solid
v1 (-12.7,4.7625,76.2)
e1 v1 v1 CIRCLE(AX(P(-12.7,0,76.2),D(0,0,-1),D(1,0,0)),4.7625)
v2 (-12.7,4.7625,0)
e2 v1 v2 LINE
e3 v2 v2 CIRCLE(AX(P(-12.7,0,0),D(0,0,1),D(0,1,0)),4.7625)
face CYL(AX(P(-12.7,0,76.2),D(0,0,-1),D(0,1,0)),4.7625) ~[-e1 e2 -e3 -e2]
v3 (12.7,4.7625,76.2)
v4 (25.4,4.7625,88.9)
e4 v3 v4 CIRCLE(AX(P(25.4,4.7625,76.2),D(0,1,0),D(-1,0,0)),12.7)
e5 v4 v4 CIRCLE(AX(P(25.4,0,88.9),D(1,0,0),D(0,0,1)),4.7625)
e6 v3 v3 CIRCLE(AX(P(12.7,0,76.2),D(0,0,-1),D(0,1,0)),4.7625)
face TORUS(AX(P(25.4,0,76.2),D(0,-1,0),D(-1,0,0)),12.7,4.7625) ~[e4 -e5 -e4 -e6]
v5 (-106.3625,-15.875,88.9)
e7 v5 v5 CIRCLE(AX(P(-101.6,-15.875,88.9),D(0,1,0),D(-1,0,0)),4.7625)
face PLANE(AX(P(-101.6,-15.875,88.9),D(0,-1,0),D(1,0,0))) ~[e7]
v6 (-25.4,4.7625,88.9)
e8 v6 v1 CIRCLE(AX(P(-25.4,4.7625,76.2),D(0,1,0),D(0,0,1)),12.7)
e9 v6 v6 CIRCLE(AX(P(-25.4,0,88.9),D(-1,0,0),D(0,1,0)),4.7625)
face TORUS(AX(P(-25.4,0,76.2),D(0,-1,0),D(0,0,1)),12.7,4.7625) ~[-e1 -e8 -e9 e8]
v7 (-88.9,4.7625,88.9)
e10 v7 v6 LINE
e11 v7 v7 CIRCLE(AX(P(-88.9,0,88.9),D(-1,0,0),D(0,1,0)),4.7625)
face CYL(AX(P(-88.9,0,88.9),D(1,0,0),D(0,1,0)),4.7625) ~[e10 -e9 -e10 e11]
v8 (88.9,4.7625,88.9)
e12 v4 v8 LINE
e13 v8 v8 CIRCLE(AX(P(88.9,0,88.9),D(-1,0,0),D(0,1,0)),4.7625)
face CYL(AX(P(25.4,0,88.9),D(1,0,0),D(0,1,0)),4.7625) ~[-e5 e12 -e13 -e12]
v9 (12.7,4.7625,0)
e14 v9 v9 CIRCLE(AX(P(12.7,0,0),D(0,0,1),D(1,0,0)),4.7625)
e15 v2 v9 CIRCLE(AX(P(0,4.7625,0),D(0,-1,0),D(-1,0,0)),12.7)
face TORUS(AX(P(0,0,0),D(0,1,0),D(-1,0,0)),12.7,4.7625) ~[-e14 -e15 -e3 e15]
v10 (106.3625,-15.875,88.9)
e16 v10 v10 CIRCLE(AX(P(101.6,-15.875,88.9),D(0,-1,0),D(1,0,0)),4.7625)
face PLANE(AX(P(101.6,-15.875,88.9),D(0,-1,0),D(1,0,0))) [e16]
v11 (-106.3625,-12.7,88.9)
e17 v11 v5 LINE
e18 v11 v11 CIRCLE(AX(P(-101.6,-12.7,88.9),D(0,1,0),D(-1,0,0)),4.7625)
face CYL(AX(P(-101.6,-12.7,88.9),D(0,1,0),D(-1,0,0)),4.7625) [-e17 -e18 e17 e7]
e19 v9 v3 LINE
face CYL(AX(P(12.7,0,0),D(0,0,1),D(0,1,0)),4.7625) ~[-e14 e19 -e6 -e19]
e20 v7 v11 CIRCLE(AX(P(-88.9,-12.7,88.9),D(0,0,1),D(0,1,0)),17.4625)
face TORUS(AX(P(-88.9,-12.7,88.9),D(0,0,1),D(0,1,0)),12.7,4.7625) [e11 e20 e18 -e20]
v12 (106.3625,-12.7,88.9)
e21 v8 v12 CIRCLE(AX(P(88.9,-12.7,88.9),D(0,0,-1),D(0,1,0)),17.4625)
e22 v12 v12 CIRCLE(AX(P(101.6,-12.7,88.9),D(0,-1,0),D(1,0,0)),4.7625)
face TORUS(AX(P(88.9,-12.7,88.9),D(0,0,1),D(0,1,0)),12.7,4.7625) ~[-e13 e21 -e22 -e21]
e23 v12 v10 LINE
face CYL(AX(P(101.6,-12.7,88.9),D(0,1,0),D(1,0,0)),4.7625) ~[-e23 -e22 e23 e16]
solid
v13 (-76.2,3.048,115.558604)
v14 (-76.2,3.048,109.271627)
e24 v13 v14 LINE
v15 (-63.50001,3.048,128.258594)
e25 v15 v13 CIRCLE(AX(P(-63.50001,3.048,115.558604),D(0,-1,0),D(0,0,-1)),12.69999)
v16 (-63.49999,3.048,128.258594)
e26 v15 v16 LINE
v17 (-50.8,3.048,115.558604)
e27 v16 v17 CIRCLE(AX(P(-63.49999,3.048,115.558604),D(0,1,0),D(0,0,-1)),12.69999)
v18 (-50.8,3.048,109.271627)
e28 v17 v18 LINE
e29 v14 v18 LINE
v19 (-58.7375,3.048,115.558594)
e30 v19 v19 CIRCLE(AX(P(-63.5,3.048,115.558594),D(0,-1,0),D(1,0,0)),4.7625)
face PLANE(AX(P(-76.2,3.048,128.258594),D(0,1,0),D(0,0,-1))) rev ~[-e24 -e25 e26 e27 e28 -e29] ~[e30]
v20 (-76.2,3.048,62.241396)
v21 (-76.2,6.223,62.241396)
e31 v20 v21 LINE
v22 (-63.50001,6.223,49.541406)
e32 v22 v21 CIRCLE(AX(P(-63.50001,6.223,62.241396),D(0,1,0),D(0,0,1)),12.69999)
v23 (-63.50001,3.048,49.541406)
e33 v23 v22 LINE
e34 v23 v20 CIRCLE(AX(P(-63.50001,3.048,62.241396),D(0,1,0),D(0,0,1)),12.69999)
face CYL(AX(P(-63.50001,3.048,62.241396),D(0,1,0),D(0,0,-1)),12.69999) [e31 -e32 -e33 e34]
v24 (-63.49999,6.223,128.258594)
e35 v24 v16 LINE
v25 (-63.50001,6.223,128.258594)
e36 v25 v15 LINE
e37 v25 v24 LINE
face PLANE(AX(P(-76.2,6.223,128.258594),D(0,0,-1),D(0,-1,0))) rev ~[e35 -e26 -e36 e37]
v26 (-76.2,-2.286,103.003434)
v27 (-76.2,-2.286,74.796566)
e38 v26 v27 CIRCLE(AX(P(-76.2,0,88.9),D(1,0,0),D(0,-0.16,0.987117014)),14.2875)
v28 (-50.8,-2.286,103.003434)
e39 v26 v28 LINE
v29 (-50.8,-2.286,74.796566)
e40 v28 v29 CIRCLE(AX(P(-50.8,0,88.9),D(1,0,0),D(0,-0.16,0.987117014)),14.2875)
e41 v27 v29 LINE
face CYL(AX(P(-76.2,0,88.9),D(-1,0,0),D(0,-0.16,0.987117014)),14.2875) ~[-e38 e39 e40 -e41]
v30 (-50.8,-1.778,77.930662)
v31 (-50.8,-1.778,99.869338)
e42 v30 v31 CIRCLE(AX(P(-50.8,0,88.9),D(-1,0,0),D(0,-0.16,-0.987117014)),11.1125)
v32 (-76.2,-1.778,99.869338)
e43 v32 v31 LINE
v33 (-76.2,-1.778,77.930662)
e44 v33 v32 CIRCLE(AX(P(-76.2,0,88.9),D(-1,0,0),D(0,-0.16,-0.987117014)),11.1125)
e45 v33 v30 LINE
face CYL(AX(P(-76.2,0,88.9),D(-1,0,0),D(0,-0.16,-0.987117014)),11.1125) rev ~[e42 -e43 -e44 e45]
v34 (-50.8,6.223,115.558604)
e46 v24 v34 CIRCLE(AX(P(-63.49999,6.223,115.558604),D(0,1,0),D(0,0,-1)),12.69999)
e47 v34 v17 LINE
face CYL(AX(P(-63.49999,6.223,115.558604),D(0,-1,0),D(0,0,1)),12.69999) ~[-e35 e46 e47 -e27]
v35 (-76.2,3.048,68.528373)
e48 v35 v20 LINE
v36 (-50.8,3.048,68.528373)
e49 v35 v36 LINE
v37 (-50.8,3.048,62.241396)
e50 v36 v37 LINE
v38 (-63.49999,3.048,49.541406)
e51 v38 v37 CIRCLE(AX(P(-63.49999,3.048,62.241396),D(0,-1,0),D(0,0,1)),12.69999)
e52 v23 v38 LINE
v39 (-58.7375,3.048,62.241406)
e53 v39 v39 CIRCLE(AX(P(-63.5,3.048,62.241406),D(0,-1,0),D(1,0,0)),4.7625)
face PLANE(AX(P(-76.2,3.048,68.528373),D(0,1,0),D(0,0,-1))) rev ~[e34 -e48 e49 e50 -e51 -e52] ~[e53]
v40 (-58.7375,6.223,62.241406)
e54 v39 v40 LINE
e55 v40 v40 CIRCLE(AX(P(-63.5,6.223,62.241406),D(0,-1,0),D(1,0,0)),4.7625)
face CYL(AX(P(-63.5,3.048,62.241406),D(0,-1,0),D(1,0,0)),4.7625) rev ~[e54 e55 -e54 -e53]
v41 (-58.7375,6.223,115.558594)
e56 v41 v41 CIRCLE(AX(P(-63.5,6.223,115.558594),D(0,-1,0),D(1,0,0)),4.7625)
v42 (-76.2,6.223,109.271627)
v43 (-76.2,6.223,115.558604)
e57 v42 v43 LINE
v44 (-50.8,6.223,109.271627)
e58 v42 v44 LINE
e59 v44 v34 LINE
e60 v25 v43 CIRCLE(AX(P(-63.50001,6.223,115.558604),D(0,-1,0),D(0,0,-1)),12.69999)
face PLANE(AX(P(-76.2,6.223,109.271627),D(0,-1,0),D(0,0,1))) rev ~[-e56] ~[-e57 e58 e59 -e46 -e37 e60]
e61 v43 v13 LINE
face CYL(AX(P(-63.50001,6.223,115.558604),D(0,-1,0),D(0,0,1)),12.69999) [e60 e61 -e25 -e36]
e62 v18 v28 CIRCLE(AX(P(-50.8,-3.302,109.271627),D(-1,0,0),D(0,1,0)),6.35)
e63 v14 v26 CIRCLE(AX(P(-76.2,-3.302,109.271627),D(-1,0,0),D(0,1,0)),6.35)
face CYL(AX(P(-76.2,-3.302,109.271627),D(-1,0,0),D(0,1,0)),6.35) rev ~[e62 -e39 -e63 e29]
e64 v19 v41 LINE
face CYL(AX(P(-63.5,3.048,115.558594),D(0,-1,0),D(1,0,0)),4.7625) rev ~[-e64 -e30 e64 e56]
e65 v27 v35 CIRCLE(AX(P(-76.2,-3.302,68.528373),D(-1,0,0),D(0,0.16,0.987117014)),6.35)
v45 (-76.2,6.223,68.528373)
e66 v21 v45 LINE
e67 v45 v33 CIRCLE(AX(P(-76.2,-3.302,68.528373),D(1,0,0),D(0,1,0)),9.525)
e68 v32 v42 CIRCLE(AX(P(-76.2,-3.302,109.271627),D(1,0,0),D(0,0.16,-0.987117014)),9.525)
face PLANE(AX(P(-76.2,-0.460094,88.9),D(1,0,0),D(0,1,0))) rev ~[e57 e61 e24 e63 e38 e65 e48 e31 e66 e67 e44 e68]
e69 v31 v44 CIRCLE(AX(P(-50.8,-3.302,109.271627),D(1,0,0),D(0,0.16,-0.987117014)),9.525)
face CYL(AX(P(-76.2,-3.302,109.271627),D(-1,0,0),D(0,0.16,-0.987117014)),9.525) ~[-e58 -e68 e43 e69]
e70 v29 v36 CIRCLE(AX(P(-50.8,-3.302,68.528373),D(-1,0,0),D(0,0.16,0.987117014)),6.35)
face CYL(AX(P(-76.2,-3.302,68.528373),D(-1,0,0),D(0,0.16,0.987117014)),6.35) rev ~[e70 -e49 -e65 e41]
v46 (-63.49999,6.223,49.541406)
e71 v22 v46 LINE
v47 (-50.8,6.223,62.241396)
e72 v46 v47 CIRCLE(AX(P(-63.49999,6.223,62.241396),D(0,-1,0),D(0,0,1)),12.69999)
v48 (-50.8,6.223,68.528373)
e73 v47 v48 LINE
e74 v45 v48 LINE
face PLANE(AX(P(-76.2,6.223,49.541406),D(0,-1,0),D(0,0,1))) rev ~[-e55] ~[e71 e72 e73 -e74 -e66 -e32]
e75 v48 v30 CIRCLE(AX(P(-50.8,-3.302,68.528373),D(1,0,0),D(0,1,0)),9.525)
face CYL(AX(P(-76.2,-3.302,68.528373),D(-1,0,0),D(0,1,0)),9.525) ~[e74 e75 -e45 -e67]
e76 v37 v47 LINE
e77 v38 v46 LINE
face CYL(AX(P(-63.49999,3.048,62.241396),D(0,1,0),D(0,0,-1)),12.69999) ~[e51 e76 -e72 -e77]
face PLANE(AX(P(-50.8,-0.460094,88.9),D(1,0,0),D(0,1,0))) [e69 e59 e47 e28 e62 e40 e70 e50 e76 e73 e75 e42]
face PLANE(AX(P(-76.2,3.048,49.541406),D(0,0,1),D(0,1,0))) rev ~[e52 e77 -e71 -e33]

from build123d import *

# Parameters (mm, degrees)
F2_R      = 4.7625
F5_ANGLE  = 90
F6_DEPTH  = 3.175
F11_DEPTH = 25.4
F12_R     = 12.69999
F13_R     = 4.7625
F14_DEPTH = 3.176


# Not quite as in the source:
# - a fillet or chamfer is up to 0.001 mm smaller than in the source, because OpenCascade refuses the exact size
# - a feature names something its author has since deleted; it is built from what else it names


with BuildPart() as f3:
    # F3: sweep along a path in F0
    with BuildLine(Plane.XZ) as f3_path:
        Line((88.9, 88.9), (25.4, 88.9))
        ThreePointArc((25.4, 88.9), (16.4197438789, 85.1802561211), (12.7, 76.2))
        Line((12.7, 76.2), (12.7, 0))
        ThreePointArc((12.7, 0), (0, -12.7), (-12.7, 0))
        Line((-12.7, 0), (-12.7, 76.2))
        ThreePointArc((-12.7, 76.2), (-16.4197438789, 85.1802561211), (-25.4, 88.9))
        Line((-25.4, 88.9), (-88.9, 88.9))
    # F2 (on line) → F3 (sweep)
    with BuildSketch(Plane.YZ.offset(88.9)):
        with Locations((0, 88.9)):
            Circle(F2_R)
    sweep(path=f3_path.line)

    # F2 (on line) → F5 (revolve)
    with BuildSketch(Plane.YZ.offset(88.9)):
        with Locations((0, 88.9)):
            Circle(F2_R)
    revolve(axis=Axis((88.9, -12.7, 113.1016425788), (0, 0, -1)), revolution_arc=F5_ANGLE)

    # F6 (add): a face of the model
    f6_faces = [f3.faces().sort_by_distance(p)[0] for p in [
        (101.6, -12.7, 88.9),
    ]]
    extrude(f6_faces, amount=F6_DEPTH)


with BuildPart() as f7_1:
    # F7: instance of F3
    add(f3.part.mirror(Plane.YZ))

    # F8: union F3
    add(f3.part)


with BuildPart() as f11:
    # F10 (on offset) → F11 (new body)
    with BuildSketch(Plane.YZ.offset(-76.2)):
        with BuildLine():
            ThreePointArc((3.048, 109.2716273834), (1.5340159222, 105.15635704), (-2.286, 103.0034343424))
            ThreePointArc((-2.286, 103.0034343424), (-14.2875, 88.9), (-2.286, 74.7965656576))
            ThreePointArc((-2.286, 74.7965656576), (1.5340159222, 72.64364296), (3.048, 68.5283726166))
            Line((3.048, 68.5283726166), (3.048, 49.5414057925))
            Line((3.048, 49.5414057925), (6.223, 49.5414057925))
            Line((6.223, 49.5414057925), (6.223, 68.5283726166))
            ThreePointArc((6.223, 68.5283726166), (3.9520238833, 74.7012781318), (-1.778, 77.9306621781))
            ThreePointArc((-1.778, 77.9306621781), (-11.1125, 88.9), (-1.778, 99.8693378219))
            ThreePointArc((-1.778, 99.8693378219), (3.9520238833, 103.0987218682), (6.223, 109.2716273834))
            Line((6.223, 109.2716273834), (6.223, 128.2585942075))
            Line((6.223, 128.2585942075), (3.048, 128.2585942075))
            Line((3.048, 128.2585942075), (3.048, 109.2716273834))
        make_face()
    extrude(amount=F11_DEPTH)

    # F12 (radius 12.7 in the source; OpenCascade refuses exactly that, so slightly less here)
    f12_edges = [f11.edges().sort_by_distance(p)[0] for p in [
        (-76.2, 4.6355, 128.258594),
        (-50.8, 4.6355, 128.258594),
        (-50.8, 4.6355, 49.541406),
        (-76.2, 4.6355, 49.541406),
    ]]
    fillet(f12_edges, radius=F12_R)

    # F13 (on face) → F14 (cut, through all)
    with BuildSketch(Plane.XZ.offset(-3.048)):
        with Locations((-63.5, 115.5585942075)):
            Circle(F13_R)
        with Locations((-63.5, 62.2414057925)):
            Circle(F13_R)
    extrude(amount=-F14_DEPTH, mode=Mode.SUBTRACT)


solid = Compound([f7_1.part, f11.part])
